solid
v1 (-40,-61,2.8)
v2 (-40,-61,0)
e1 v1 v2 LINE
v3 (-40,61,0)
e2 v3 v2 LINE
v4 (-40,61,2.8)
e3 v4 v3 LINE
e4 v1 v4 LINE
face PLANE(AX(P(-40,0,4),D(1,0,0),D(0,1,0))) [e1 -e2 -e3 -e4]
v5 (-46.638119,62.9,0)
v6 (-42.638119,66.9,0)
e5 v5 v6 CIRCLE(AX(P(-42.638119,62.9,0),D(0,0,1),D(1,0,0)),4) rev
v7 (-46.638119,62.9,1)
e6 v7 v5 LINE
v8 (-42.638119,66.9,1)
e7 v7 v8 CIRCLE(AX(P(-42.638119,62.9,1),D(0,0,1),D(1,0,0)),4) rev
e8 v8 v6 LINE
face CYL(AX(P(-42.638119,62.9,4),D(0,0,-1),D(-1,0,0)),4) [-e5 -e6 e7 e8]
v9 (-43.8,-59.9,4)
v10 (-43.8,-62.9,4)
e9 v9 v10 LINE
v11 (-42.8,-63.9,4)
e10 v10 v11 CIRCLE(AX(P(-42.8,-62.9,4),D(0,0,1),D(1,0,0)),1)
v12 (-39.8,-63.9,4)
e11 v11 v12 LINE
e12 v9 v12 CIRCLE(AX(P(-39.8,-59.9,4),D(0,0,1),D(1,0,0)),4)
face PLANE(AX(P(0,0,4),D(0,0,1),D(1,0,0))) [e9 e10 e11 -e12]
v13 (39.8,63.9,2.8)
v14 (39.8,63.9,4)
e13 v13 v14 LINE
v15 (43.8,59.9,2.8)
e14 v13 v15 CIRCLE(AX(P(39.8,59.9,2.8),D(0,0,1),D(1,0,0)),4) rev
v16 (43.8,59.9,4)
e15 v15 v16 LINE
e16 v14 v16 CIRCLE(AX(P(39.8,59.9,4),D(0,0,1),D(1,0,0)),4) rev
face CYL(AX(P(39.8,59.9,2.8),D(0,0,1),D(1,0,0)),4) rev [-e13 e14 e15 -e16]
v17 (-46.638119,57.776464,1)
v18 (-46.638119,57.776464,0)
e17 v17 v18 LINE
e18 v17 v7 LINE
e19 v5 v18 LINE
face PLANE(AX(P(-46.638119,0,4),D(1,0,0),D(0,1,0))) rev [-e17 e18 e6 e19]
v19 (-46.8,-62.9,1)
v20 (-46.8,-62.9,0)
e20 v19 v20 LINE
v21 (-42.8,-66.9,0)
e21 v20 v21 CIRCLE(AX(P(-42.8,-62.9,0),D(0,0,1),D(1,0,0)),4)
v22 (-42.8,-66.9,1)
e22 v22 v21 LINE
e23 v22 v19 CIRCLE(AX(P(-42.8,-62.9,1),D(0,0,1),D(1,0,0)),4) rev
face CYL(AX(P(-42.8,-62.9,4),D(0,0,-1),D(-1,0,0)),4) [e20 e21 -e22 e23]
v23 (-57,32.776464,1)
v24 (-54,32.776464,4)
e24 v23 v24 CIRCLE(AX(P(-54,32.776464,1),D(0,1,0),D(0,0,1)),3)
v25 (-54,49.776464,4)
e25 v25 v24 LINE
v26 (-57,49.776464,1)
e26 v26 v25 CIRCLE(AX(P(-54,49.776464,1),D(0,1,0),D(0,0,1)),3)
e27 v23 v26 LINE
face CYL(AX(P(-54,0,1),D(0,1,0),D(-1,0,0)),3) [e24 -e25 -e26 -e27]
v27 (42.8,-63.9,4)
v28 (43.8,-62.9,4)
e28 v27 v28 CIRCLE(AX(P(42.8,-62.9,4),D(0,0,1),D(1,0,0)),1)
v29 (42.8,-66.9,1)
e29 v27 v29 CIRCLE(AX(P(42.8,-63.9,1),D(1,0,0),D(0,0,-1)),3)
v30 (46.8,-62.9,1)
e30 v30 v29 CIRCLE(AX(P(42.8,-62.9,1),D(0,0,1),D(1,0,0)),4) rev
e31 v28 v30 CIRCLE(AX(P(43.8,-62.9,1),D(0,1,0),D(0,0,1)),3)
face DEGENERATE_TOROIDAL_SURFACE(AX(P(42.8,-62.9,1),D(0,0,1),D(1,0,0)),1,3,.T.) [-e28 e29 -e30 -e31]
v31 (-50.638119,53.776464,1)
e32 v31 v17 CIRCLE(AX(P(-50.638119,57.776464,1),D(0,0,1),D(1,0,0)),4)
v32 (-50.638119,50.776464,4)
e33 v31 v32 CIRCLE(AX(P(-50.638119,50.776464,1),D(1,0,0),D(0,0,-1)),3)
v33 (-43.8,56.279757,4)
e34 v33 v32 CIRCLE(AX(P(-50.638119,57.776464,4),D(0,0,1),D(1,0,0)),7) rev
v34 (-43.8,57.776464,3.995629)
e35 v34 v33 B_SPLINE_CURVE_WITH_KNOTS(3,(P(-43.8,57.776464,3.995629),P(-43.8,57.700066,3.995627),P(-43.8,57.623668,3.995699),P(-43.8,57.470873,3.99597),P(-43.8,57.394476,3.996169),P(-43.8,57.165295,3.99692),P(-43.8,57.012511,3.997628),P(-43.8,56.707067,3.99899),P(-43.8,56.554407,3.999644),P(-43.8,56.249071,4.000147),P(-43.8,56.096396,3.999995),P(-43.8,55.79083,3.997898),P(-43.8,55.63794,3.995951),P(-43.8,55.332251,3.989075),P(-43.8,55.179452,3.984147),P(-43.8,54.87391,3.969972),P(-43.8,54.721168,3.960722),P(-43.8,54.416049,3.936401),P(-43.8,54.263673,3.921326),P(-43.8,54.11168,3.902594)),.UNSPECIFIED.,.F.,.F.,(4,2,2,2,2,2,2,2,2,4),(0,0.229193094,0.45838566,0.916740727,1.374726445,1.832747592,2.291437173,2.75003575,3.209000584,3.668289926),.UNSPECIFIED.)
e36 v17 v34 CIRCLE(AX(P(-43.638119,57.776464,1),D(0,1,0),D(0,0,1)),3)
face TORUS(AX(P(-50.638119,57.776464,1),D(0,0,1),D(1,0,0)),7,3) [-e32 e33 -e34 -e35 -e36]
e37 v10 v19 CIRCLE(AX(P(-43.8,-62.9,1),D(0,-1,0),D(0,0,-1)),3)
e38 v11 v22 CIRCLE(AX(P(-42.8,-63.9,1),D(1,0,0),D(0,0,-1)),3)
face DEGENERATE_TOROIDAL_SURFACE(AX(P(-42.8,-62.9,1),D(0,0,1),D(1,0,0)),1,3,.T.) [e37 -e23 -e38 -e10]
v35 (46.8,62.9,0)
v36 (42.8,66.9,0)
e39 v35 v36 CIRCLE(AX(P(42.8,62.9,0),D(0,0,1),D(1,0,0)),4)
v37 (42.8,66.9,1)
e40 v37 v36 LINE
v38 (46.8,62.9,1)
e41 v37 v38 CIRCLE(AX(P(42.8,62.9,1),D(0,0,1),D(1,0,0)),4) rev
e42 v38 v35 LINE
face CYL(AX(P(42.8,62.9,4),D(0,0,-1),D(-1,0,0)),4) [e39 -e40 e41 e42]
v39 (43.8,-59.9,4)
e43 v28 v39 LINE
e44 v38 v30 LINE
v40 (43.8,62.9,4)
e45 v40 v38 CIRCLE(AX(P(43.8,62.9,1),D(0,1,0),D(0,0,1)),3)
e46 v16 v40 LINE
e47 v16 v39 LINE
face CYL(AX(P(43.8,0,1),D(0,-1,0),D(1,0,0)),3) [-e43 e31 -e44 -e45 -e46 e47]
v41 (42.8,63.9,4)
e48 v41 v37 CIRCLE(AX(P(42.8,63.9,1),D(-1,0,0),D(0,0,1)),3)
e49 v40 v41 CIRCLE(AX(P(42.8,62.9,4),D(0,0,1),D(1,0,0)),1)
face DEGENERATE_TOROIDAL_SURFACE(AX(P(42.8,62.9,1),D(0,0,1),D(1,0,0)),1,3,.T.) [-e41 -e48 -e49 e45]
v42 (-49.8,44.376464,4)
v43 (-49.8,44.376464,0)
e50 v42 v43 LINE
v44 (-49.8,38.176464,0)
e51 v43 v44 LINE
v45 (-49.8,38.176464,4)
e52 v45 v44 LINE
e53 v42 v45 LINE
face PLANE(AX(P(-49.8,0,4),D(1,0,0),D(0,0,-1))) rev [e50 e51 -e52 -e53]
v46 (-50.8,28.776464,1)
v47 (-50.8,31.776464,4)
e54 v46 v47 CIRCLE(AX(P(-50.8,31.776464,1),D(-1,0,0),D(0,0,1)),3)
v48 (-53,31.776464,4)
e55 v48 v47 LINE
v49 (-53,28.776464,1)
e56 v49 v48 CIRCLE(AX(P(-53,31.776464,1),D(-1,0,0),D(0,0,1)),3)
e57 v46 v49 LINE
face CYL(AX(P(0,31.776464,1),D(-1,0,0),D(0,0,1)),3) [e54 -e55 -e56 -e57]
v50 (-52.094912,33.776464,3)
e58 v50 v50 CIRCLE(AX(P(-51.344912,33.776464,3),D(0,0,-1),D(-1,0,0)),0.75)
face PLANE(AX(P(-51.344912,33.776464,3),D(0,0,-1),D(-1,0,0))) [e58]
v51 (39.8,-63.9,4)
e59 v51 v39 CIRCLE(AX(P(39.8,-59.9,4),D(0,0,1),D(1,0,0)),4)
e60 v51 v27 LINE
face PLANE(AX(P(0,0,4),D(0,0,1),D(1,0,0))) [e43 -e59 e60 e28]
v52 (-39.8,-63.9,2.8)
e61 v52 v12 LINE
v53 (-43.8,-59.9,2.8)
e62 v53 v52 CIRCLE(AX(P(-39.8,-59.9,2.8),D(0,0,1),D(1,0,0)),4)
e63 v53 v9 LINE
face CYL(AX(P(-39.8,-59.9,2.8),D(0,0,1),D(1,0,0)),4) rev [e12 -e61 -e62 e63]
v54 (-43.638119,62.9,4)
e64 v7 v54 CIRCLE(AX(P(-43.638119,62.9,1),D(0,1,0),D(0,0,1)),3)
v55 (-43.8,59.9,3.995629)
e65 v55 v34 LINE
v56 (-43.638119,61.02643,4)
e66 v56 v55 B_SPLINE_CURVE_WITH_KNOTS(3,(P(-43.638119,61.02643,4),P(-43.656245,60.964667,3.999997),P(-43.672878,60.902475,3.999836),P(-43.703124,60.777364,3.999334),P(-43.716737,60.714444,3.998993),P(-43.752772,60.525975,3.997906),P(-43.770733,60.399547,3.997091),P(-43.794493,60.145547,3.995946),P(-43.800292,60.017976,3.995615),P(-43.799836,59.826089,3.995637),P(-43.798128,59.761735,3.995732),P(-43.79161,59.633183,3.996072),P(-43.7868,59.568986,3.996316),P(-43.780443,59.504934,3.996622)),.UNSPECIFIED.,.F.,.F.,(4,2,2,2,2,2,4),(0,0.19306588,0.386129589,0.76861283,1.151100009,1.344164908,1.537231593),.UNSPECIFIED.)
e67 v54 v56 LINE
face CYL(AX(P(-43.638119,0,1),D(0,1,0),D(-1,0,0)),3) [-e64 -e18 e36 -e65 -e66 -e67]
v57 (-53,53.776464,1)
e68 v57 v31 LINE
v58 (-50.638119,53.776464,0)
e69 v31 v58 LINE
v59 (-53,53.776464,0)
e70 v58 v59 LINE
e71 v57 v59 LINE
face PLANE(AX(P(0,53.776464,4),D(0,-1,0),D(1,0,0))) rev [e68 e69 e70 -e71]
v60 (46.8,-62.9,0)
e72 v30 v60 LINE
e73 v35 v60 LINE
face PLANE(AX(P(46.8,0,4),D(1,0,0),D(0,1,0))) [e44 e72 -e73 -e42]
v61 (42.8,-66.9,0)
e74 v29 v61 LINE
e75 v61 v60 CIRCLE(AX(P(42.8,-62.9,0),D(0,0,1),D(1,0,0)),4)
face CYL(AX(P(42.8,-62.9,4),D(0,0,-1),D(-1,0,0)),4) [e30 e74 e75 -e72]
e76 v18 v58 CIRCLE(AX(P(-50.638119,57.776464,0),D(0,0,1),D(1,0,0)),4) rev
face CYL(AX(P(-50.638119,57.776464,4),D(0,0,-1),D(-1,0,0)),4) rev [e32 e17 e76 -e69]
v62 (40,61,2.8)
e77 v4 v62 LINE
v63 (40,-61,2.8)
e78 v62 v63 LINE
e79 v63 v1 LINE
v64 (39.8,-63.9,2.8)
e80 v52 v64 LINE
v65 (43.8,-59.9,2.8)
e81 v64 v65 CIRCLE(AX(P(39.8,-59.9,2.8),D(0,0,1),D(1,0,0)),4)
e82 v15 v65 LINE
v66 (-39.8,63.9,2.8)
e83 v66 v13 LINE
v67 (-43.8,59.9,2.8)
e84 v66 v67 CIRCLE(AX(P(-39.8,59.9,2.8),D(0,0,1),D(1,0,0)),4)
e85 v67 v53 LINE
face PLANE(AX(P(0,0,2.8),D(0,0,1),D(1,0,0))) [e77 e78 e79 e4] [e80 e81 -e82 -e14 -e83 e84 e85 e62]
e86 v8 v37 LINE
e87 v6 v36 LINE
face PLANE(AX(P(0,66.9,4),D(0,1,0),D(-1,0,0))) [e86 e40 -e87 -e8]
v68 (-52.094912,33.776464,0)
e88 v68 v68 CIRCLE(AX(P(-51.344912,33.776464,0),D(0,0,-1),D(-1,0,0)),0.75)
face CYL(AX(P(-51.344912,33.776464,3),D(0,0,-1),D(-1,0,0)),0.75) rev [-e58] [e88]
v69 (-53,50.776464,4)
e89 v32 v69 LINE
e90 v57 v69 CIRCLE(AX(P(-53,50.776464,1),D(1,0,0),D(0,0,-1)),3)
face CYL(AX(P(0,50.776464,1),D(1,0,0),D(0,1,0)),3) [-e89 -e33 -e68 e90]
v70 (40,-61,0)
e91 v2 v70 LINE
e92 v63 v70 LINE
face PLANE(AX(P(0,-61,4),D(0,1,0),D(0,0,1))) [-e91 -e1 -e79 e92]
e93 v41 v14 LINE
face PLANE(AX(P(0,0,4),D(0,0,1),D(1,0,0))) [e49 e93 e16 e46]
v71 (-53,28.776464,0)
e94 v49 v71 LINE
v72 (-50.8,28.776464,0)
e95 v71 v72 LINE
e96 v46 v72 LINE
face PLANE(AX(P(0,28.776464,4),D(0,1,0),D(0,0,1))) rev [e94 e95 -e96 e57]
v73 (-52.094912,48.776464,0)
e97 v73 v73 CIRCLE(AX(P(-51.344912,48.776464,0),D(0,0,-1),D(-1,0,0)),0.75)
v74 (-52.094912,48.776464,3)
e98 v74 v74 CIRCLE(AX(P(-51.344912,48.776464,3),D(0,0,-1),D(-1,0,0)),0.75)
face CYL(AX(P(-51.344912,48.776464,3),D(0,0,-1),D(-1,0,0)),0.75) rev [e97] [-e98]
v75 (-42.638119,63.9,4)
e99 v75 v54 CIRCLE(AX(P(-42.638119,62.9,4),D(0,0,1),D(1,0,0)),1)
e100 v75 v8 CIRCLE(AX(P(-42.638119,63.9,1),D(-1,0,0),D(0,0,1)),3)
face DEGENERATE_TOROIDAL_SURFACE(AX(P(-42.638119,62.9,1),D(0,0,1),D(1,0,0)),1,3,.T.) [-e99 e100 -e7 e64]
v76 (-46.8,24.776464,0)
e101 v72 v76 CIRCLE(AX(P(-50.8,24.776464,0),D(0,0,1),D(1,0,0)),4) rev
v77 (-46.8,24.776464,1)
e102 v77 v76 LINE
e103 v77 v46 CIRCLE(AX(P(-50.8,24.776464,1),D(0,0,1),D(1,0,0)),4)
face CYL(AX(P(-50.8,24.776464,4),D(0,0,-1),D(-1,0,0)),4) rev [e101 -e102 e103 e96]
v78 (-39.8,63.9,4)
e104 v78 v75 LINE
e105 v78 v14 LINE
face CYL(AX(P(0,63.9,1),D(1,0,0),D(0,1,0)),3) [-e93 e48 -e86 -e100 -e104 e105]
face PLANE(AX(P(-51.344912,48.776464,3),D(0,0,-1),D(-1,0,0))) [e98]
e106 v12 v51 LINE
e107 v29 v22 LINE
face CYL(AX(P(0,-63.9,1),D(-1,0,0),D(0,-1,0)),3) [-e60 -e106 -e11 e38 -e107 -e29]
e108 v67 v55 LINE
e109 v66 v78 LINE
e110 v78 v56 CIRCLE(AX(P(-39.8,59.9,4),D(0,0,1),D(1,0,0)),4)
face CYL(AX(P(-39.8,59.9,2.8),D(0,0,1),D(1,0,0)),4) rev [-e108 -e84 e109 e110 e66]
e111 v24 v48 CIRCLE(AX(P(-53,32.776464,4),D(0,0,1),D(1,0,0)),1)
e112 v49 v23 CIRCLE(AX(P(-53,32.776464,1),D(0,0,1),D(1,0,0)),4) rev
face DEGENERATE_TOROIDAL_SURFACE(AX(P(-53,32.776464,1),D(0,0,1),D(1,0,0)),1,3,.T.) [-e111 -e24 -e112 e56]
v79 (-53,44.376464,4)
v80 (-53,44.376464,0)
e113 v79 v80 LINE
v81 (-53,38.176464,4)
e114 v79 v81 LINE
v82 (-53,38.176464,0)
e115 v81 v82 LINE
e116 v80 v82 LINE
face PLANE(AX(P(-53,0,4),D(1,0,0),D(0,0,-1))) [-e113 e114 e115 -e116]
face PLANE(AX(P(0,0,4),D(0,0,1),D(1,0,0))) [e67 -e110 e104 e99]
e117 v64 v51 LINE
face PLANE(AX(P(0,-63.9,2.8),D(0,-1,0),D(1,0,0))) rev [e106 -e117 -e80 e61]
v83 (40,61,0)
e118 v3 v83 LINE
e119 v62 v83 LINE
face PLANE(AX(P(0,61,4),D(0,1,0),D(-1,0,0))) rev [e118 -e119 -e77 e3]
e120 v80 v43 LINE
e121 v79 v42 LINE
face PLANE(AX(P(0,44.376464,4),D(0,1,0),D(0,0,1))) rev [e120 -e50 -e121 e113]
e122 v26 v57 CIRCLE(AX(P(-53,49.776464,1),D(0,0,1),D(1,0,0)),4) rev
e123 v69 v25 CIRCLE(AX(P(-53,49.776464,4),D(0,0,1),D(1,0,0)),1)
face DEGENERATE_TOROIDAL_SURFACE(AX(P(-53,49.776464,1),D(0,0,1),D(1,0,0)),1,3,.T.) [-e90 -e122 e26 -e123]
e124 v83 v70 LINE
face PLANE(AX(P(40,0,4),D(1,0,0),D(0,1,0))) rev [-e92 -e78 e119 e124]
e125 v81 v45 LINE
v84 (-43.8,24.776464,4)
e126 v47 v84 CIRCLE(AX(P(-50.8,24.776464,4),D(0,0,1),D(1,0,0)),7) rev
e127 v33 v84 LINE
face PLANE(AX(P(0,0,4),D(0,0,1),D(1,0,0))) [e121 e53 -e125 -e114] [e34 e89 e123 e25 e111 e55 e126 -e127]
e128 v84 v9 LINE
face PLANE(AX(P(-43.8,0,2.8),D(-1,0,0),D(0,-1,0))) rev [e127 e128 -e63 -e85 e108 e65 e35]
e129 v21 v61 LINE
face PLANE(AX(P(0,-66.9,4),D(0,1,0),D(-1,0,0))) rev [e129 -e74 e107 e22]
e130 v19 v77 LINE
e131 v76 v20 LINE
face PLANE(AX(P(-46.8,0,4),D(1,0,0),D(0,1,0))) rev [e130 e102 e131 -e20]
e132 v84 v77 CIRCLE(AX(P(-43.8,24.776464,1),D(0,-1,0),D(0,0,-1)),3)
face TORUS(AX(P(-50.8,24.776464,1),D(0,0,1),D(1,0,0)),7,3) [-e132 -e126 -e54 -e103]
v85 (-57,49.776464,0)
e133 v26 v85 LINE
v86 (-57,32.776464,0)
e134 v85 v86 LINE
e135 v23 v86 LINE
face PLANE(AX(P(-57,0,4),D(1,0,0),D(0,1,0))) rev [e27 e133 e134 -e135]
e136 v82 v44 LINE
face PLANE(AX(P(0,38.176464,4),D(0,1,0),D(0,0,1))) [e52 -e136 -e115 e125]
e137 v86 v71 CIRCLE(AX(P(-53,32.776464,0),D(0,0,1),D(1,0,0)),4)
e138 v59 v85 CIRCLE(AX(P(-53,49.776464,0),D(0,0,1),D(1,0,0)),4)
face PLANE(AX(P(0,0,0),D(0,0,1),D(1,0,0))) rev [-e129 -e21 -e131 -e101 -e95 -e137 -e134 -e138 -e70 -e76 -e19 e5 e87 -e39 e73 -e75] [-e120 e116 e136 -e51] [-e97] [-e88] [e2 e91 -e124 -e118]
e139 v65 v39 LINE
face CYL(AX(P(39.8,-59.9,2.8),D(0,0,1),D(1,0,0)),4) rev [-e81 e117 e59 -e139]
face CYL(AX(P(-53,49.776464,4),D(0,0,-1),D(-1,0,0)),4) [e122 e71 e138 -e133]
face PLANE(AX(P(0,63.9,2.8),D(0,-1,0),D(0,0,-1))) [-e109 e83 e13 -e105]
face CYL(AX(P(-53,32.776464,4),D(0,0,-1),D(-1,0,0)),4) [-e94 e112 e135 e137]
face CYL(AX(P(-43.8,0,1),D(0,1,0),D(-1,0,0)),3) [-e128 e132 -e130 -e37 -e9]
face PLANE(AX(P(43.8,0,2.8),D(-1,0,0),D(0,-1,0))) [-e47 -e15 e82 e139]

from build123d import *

# Parameters (mm, degrees)
SCHIZZO1_W                   = 3.2
SCHIZZO1_H                   = 6.2
SCHIZZO1_W_2                 = 80
SCHIZZO1_H_2                 = 122
ESTRUSIONE_ESTRUSIONE1_DEPTH = 4
SCHIZZO5_W                   = 80
SCHIZZO5_H                   = 122
TAGLIO_ESTRUSIONE4_DEPTH     = 1.2
SCHIZZO6_R                   = 0.75
TAGLIO_ESTRUSIONE5_DEPTH     = 3
RACCORDO1_R                  = 3


with BuildPart() as part:
    # Schizzo1 → Estrusione-Estrusione1 (new body)
    with BuildSketch(Plane.XY):
        with BuildLine():
            Line((-42.8, -66.9), (42.8, -66.9))
            ThreePointArc((42.8, -66.9), (45.628427125, -65.728427125), (46.8, -62.9))
            Line((46.8, -62.9), (46.8, 62.9))
            ThreePointArc((46.8, 62.9), (45.628427125, 65.728427125), (42.8, 66.9))
            Line((42.8, 66.9), (-42.638118868, 66.9))
            ThreePointArc((-42.638118868, 66.9), (-45.466545993, 65.728427125), (-46.638118868, 62.9))
            Line((-46.638118868, 62.9), (-46.638118868, 57.77646377))
            ThreePointArc((-46.638118868, 57.77646377), (-47.809691743, 54.948036646), (-50.638118868, 53.77646377))
            Line((-50.638118868, 53.77646377), (-53, 53.77646377))
            ThreePointArc((-53, 53.77646377), (-55.828427125, 52.604890895), (-57, 49.77646377))
            Line((-57, 49.77646377), (-57, 32.77646377))
            ThreePointArc((-57, 32.77646377), (-55.828427125, 29.948036646), (-53, 28.77646377))
            Line((-53, 28.77646377), (-50.8, 28.77646377))
            ThreePointArc((-50.8, 28.77646377), (-47.971572875, 27.604890895), (-46.8, 24.77646377))
            Line((-46.8, 24.77646377), (-46.8, -62.9))
            ThreePointArc((-46.8, -62.9), (-45.628427125, -65.728427125), (-42.8, -66.9))
        make_face()
        with Locations((-51.4, 41.27646377)):
            Rectangle(SCHIZZO1_W, SCHIZZO1_H, mode=Mode.SUBTRACT)
        Rectangle(SCHIZZO1_W_2, SCHIZZO1_H_2, mode=Mode.SUBTRACT)
    extrude(amount=ESTRUSIONE_ESTRUSIONE1_DEPTH)

    # Schizzo5 → Taglio-Estrusione4 (cut)
    with BuildSketch(Plane.XY.offset(4)):
        with BuildLine():
            Line((-39.8, 63.9), (39.8, 63.9))
            ThreePointArc((39.8, 63.9), (42.628427125, 62.728427125), (43.8, 59.9))
            Line((43.8, 59.9), (43.8, -59.9))
            ThreePointArc((43.8, -59.9), (42.628427125, -62.728427125), (39.8, -63.9))
            Line((39.8, -63.9), (-39.8, -63.9))
            ThreePointArc((-39.8, -63.9), (-42.628427125, -62.728427125), (-43.8, -59.9))
            Line((-43.8, -59.9), (-43.8, 59.9))
            ThreePointArc((-43.8, 59.9), (-42.628427125, 62.728427125), (-39.8, 63.9))
        make_face()
        Rectangle(SCHIZZO5_W, SCHIZZO5_H, mode=Mode.SUBTRACT)
    extrude(amount=-TAGLIO_ESTRUSIONE4_DEPTH, mode=Mode.SUBTRACT)

    # Schizzo6 → Taglio-Estrusione5 (cut)
    with BuildSketch(Plane(origin=(0, 0, 0), x_dir=(-1, 0, 0), z_dir=(0, 0, -1))):
        with Locations((51.344911825, 48.77646377)):
            Circle(SCHIZZO6_R)
        with Locations((51.344911825, 33.77646377)):
            Circle(SCHIZZO6_R)
    extrude(amount=-TAGLIO_ESTRUSIONE5_DEPTH, mode=Mode.SUBTRACT)

    # Raccordo1
    # the kernel refuses this fillet: 3 mm, written as the material it takes off along each edge
    with BuildSketch(Plane(origin=(-42.8, -66.9, 4), x_dir=(0, 0, -1), z_dir=(1, 0, 0))) as raccordo1_piece_1:
        with BuildLine():
            CenterArc((RACCORDO1_R, RACCORDO1_R), RACCORDO1_R, 180, 90)
            Line((0, RACCORDO1_R), (0, 0))
            Line((0, 0), (RACCORDO1_R, 0))
        make_face()
    extrude(amount=85.6, mode=Mode.SUBTRACT)
    with BuildSketch(Plane(origin=(42.8, -62.9, 4), x_dir=(0, -1, 0), z_dir=(-1, 0, 0))) as raccordo1_piece_2:
        with BuildLine():
            CenterArc((4 - RACCORDO1_R, -RACCORDO1_R), RACCORDO1_R, 0, 90)
            Line((4 - RACCORDO1_R, 0), (4, 0))
            Line((4, 0), (4, -RACCORDO1_R))
        make_face()
    revolve(axis=Axis((42.8, -62.9, 4), (0, 0, 1)), revolution_arc=90, mode=Mode.SUBTRACT)
    with BuildSketch(Plane(origin=(46.8, -62.9, 4), x_dir=(-1, 0, 0), z_dir=(0, 1, 0))) as raccordo1_piece_3:
        with BuildLine():
            CenterArc((RACCORDO1_R, -RACCORDO1_R), RACCORDO1_R, 90, 90)
            Line((0, -RACCORDO1_R), (0, 0))
            Line((0, 0), (RACCORDO1_R, 0))
        make_face()
    extrude(amount=125.8, mode=Mode.SUBTRACT)
    with BuildSketch(Plane(origin=(42.8, 62.9, 4), x_dir=(1, 0, 0), z_dir=(0, -1, 0))) as raccordo1_piece_4:
        with BuildLine():
            CenterArc((4 - RACCORDO1_R, -RACCORDO1_R), RACCORDO1_R, 0, 90)
            Line((4, -RACCORDO1_R), (4, 0))
            Line((4, 0), (4 - RACCORDO1_R, 0))
        make_face()
    revolve(axis=Axis((42.8, 62.9, 4), (0, 0, 1)), revolution_arc=90, mode=Mode.SUBTRACT)
    with BuildSketch(Plane(origin=(42.8, 66.9, 4), x_dir=(0, -1, 0), z_dir=(-1, 0, 0))) as raccordo1_piece_5:
        with BuildLine():
            CenterArc((RACCORDO1_R, -RACCORDO1_R), RACCORDO1_R, 90, 90)
            Line((0, -RACCORDO1_R), (0, 0))
            Line((0, 0), (RACCORDO1_R, 0))
        make_face()
    extrude(amount=85.438118868, mode=Mode.SUBTRACT)
    with BuildSketch(Plane(origin=(-42.638118868, 62.9, 4), x_dir=(0, 1, 0), z_dir=(1, 0, 0))) as raccordo1_piece_6:
        with BuildLine():
            CenterArc((4 - RACCORDO1_R, -RACCORDO1_R), RACCORDO1_R, 0, 90)
            Line((4, -RACCORDO1_R), (4, 0))
            Line((4, 0), (4 - RACCORDO1_R, 0))
        make_face()
    revolve(axis=Axis((-42.638118868, 62.9, 4), (0, 0, 1)), revolution_arc=90, mode=Mode.SUBTRACT)
    with BuildSketch(Plane(origin=(-46.638118868, 62.9, 4), x_dir=(1, 0, 0), z_dir=(0, -1, 0))) as raccordo1_piece_7:
        with BuildLine():
            CenterArc((RACCORDO1_R, -RACCORDO1_R), RACCORDO1_R, 90, 90)
            Line((0, -RACCORDO1_R), (0, 0))
            Line((0, 0), (RACCORDO1_R, 0))
        make_face()
    extrude(amount=5.12353623, mode=Mode.SUBTRACT)
    with BuildSketch(Plane(origin=(-50.638118868, 57.77646377, 4), x_dir=(1, 0, 0), z_dir=(0, 1, 0))) as raccordo1_piece_8:
        with BuildLine():
            CenterArc((4 + RACCORDO1_R, RACCORDO1_R), RACCORDO1_R, 180, 90)
            Line((4, RACCORDO1_R), (4, 0))
            Line((4, 0), (4 + RACCORDO1_R, 0))
        make_face()
    revolve(axis=Axis((-50.638118868, 57.77646377, 4), (0, 0, -1)), revolution_arc=90, mode=Mode.SUBTRACT)
    with BuildSketch(Plane(origin=(-50.638118868, 53.77646377, 4), x_dir=(0, -1, 0), z_dir=(-1, 0, 0))) as raccordo1_piece_9:
        with BuildLine():
            CenterArc((RACCORDO1_R, -RACCORDO1_R), RACCORDO1_R, 90, 90)
            Line((0, -RACCORDO1_R), (0, 0))
            Line((0, 0), (RACCORDO1_R, 0))
        make_face()
    extrude(amount=2.361881132, mode=Mode.SUBTRACT)
    with BuildSketch(Plane(origin=(-53, 49.77646377, 4), x_dir=(0, 1, 0), z_dir=(1, 0, 0))) as raccordo1_piece_10:
        with BuildLine():
            CenterArc((4 - RACCORDO1_R, -RACCORDO1_R), RACCORDO1_R, 0, 90)
            Line((4, -RACCORDO1_R), (4, 0))
            Line((4, 0), (4 - RACCORDO1_R, 0))
        make_face()
    revolve(axis=Axis((-53, 49.77646377, 4), (0, 0, 1)), revolution_arc=90, mode=Mode.SUBTRACT)
    with BuildSketch(Plane(origin=(-57, 49.77646377, 4), x_dir=(1, 0, 0), z_dir=(0, -1, 0))) as raccordo1_piece_11:
        with BuildLine():
            CenterArc((RACCORDO1_R, -RACCORDO1_R), RACCORDO1_R, 90, 90)
            Line((0, -RACCORDO1_R), (0, 0))
            Line((0, 0), (RACCORDO1_R, 0))
        make_face()
    extrude(amount=17, mode=Mode.SUBTRACT)
    with BuildSketch(Plane(origin=(-53, 32.77646377, 4), x_dir=(-1, 0, 0), z_dir=(0, 1, 0))) as raccordo1_piece_12:
        with BuildLine():
            CenterArc((4 - RACCORDO1_R, -RACCORDO1_R), RACCORDO1_R, 0, 90)
            Line((4, -RACCORDO1_R), (4, 0))
            Line((4, 0), (4 - RACCORDO1_R, 0))
        make_face()
    revolve(axis=Axis((-53, 32.77646377, 4), (0, 0, 1)), revolution_arc=90, mode=Mode.SUBTRACT)
    with BuildSketch(Plane(origin=(-53, 28.77646377, 4), x_dir=(0, 1, 0), z_dir=(1, 0, 0))) as raccordo1_piece_13:
        with BuildLine():
            CenterArc((RACCORDO1_R, -RACCORDO1_R), RACCORDO1_R, 90, 90)
            Line((0, -RACCORDO1_R), (0, 0))
            Line((0, 0), (RACCORDO1_R, 0))
        make_face()
    extrude(amount=2.2, mode=Mode.SUBTRACT)
    with BuildSketch(Plane(origin=(-50.8, 24.77646377, 4), x_dir=(0, 1, 0), z_dir=(-1, 0, 0))) as raccordo1_piece_14:
        with BuildLine():
            CenterArc((4 + RACCORDO1_R, RACCORDO1_R), RACCORDO1_R, 180, 90)
            Line((4, RACCORDO1_R), (4, 0))
            Line((4, 0), (4 + RACCORDO1_R, 0))
        make_face()
    revolve(axis=Axis((-50.8, 24.77646377, 4), (0, 0, -1)), revolution_arc=90, mode=Mode.SUBTRACT)
    with BuildSketch(Plane(origin=(-46.8, 24.77646377, 4), x_dir=(1, 0, 0), z_dir=(0, -1, 0))) as raccordo1_piece_15:
        with BuildLine():
            CenterArc((RACCORDO1_R, -RACCORDO1_R), RACCORDO1_R, 90, 90)
            Line((0, -RACCORDO1_R), (0, 0))
            Line((0, 0), (RACCORDO1_R, 0))
        make_face()
    extrude(amount=87.67646377, mode=Mode.SUBTRACT)
    with BuildSketch(Plane(origin=(-42.8, -62.9, 4), x_dir=(-1, 0, 0), z_dir=(0, 1, 0))) as raccordo1_piece_16:
        with BuildLine():
            CenterArc((4 - RACCORDO1_R, -RACCORDO1_R), RACCORDO1_R, 0, 90)
            Line((4 - RACCORDO1_R, 0), (4, 0))
            Line((4, 0), (4, -RACCORDO1_R))
        make_face()
    revolve(axis=Axis((-42.8, -62.9, 4), (0, 0, 1)), revolution_arc=90, mode=Mode.SUBTRACT)


solid = part.part
